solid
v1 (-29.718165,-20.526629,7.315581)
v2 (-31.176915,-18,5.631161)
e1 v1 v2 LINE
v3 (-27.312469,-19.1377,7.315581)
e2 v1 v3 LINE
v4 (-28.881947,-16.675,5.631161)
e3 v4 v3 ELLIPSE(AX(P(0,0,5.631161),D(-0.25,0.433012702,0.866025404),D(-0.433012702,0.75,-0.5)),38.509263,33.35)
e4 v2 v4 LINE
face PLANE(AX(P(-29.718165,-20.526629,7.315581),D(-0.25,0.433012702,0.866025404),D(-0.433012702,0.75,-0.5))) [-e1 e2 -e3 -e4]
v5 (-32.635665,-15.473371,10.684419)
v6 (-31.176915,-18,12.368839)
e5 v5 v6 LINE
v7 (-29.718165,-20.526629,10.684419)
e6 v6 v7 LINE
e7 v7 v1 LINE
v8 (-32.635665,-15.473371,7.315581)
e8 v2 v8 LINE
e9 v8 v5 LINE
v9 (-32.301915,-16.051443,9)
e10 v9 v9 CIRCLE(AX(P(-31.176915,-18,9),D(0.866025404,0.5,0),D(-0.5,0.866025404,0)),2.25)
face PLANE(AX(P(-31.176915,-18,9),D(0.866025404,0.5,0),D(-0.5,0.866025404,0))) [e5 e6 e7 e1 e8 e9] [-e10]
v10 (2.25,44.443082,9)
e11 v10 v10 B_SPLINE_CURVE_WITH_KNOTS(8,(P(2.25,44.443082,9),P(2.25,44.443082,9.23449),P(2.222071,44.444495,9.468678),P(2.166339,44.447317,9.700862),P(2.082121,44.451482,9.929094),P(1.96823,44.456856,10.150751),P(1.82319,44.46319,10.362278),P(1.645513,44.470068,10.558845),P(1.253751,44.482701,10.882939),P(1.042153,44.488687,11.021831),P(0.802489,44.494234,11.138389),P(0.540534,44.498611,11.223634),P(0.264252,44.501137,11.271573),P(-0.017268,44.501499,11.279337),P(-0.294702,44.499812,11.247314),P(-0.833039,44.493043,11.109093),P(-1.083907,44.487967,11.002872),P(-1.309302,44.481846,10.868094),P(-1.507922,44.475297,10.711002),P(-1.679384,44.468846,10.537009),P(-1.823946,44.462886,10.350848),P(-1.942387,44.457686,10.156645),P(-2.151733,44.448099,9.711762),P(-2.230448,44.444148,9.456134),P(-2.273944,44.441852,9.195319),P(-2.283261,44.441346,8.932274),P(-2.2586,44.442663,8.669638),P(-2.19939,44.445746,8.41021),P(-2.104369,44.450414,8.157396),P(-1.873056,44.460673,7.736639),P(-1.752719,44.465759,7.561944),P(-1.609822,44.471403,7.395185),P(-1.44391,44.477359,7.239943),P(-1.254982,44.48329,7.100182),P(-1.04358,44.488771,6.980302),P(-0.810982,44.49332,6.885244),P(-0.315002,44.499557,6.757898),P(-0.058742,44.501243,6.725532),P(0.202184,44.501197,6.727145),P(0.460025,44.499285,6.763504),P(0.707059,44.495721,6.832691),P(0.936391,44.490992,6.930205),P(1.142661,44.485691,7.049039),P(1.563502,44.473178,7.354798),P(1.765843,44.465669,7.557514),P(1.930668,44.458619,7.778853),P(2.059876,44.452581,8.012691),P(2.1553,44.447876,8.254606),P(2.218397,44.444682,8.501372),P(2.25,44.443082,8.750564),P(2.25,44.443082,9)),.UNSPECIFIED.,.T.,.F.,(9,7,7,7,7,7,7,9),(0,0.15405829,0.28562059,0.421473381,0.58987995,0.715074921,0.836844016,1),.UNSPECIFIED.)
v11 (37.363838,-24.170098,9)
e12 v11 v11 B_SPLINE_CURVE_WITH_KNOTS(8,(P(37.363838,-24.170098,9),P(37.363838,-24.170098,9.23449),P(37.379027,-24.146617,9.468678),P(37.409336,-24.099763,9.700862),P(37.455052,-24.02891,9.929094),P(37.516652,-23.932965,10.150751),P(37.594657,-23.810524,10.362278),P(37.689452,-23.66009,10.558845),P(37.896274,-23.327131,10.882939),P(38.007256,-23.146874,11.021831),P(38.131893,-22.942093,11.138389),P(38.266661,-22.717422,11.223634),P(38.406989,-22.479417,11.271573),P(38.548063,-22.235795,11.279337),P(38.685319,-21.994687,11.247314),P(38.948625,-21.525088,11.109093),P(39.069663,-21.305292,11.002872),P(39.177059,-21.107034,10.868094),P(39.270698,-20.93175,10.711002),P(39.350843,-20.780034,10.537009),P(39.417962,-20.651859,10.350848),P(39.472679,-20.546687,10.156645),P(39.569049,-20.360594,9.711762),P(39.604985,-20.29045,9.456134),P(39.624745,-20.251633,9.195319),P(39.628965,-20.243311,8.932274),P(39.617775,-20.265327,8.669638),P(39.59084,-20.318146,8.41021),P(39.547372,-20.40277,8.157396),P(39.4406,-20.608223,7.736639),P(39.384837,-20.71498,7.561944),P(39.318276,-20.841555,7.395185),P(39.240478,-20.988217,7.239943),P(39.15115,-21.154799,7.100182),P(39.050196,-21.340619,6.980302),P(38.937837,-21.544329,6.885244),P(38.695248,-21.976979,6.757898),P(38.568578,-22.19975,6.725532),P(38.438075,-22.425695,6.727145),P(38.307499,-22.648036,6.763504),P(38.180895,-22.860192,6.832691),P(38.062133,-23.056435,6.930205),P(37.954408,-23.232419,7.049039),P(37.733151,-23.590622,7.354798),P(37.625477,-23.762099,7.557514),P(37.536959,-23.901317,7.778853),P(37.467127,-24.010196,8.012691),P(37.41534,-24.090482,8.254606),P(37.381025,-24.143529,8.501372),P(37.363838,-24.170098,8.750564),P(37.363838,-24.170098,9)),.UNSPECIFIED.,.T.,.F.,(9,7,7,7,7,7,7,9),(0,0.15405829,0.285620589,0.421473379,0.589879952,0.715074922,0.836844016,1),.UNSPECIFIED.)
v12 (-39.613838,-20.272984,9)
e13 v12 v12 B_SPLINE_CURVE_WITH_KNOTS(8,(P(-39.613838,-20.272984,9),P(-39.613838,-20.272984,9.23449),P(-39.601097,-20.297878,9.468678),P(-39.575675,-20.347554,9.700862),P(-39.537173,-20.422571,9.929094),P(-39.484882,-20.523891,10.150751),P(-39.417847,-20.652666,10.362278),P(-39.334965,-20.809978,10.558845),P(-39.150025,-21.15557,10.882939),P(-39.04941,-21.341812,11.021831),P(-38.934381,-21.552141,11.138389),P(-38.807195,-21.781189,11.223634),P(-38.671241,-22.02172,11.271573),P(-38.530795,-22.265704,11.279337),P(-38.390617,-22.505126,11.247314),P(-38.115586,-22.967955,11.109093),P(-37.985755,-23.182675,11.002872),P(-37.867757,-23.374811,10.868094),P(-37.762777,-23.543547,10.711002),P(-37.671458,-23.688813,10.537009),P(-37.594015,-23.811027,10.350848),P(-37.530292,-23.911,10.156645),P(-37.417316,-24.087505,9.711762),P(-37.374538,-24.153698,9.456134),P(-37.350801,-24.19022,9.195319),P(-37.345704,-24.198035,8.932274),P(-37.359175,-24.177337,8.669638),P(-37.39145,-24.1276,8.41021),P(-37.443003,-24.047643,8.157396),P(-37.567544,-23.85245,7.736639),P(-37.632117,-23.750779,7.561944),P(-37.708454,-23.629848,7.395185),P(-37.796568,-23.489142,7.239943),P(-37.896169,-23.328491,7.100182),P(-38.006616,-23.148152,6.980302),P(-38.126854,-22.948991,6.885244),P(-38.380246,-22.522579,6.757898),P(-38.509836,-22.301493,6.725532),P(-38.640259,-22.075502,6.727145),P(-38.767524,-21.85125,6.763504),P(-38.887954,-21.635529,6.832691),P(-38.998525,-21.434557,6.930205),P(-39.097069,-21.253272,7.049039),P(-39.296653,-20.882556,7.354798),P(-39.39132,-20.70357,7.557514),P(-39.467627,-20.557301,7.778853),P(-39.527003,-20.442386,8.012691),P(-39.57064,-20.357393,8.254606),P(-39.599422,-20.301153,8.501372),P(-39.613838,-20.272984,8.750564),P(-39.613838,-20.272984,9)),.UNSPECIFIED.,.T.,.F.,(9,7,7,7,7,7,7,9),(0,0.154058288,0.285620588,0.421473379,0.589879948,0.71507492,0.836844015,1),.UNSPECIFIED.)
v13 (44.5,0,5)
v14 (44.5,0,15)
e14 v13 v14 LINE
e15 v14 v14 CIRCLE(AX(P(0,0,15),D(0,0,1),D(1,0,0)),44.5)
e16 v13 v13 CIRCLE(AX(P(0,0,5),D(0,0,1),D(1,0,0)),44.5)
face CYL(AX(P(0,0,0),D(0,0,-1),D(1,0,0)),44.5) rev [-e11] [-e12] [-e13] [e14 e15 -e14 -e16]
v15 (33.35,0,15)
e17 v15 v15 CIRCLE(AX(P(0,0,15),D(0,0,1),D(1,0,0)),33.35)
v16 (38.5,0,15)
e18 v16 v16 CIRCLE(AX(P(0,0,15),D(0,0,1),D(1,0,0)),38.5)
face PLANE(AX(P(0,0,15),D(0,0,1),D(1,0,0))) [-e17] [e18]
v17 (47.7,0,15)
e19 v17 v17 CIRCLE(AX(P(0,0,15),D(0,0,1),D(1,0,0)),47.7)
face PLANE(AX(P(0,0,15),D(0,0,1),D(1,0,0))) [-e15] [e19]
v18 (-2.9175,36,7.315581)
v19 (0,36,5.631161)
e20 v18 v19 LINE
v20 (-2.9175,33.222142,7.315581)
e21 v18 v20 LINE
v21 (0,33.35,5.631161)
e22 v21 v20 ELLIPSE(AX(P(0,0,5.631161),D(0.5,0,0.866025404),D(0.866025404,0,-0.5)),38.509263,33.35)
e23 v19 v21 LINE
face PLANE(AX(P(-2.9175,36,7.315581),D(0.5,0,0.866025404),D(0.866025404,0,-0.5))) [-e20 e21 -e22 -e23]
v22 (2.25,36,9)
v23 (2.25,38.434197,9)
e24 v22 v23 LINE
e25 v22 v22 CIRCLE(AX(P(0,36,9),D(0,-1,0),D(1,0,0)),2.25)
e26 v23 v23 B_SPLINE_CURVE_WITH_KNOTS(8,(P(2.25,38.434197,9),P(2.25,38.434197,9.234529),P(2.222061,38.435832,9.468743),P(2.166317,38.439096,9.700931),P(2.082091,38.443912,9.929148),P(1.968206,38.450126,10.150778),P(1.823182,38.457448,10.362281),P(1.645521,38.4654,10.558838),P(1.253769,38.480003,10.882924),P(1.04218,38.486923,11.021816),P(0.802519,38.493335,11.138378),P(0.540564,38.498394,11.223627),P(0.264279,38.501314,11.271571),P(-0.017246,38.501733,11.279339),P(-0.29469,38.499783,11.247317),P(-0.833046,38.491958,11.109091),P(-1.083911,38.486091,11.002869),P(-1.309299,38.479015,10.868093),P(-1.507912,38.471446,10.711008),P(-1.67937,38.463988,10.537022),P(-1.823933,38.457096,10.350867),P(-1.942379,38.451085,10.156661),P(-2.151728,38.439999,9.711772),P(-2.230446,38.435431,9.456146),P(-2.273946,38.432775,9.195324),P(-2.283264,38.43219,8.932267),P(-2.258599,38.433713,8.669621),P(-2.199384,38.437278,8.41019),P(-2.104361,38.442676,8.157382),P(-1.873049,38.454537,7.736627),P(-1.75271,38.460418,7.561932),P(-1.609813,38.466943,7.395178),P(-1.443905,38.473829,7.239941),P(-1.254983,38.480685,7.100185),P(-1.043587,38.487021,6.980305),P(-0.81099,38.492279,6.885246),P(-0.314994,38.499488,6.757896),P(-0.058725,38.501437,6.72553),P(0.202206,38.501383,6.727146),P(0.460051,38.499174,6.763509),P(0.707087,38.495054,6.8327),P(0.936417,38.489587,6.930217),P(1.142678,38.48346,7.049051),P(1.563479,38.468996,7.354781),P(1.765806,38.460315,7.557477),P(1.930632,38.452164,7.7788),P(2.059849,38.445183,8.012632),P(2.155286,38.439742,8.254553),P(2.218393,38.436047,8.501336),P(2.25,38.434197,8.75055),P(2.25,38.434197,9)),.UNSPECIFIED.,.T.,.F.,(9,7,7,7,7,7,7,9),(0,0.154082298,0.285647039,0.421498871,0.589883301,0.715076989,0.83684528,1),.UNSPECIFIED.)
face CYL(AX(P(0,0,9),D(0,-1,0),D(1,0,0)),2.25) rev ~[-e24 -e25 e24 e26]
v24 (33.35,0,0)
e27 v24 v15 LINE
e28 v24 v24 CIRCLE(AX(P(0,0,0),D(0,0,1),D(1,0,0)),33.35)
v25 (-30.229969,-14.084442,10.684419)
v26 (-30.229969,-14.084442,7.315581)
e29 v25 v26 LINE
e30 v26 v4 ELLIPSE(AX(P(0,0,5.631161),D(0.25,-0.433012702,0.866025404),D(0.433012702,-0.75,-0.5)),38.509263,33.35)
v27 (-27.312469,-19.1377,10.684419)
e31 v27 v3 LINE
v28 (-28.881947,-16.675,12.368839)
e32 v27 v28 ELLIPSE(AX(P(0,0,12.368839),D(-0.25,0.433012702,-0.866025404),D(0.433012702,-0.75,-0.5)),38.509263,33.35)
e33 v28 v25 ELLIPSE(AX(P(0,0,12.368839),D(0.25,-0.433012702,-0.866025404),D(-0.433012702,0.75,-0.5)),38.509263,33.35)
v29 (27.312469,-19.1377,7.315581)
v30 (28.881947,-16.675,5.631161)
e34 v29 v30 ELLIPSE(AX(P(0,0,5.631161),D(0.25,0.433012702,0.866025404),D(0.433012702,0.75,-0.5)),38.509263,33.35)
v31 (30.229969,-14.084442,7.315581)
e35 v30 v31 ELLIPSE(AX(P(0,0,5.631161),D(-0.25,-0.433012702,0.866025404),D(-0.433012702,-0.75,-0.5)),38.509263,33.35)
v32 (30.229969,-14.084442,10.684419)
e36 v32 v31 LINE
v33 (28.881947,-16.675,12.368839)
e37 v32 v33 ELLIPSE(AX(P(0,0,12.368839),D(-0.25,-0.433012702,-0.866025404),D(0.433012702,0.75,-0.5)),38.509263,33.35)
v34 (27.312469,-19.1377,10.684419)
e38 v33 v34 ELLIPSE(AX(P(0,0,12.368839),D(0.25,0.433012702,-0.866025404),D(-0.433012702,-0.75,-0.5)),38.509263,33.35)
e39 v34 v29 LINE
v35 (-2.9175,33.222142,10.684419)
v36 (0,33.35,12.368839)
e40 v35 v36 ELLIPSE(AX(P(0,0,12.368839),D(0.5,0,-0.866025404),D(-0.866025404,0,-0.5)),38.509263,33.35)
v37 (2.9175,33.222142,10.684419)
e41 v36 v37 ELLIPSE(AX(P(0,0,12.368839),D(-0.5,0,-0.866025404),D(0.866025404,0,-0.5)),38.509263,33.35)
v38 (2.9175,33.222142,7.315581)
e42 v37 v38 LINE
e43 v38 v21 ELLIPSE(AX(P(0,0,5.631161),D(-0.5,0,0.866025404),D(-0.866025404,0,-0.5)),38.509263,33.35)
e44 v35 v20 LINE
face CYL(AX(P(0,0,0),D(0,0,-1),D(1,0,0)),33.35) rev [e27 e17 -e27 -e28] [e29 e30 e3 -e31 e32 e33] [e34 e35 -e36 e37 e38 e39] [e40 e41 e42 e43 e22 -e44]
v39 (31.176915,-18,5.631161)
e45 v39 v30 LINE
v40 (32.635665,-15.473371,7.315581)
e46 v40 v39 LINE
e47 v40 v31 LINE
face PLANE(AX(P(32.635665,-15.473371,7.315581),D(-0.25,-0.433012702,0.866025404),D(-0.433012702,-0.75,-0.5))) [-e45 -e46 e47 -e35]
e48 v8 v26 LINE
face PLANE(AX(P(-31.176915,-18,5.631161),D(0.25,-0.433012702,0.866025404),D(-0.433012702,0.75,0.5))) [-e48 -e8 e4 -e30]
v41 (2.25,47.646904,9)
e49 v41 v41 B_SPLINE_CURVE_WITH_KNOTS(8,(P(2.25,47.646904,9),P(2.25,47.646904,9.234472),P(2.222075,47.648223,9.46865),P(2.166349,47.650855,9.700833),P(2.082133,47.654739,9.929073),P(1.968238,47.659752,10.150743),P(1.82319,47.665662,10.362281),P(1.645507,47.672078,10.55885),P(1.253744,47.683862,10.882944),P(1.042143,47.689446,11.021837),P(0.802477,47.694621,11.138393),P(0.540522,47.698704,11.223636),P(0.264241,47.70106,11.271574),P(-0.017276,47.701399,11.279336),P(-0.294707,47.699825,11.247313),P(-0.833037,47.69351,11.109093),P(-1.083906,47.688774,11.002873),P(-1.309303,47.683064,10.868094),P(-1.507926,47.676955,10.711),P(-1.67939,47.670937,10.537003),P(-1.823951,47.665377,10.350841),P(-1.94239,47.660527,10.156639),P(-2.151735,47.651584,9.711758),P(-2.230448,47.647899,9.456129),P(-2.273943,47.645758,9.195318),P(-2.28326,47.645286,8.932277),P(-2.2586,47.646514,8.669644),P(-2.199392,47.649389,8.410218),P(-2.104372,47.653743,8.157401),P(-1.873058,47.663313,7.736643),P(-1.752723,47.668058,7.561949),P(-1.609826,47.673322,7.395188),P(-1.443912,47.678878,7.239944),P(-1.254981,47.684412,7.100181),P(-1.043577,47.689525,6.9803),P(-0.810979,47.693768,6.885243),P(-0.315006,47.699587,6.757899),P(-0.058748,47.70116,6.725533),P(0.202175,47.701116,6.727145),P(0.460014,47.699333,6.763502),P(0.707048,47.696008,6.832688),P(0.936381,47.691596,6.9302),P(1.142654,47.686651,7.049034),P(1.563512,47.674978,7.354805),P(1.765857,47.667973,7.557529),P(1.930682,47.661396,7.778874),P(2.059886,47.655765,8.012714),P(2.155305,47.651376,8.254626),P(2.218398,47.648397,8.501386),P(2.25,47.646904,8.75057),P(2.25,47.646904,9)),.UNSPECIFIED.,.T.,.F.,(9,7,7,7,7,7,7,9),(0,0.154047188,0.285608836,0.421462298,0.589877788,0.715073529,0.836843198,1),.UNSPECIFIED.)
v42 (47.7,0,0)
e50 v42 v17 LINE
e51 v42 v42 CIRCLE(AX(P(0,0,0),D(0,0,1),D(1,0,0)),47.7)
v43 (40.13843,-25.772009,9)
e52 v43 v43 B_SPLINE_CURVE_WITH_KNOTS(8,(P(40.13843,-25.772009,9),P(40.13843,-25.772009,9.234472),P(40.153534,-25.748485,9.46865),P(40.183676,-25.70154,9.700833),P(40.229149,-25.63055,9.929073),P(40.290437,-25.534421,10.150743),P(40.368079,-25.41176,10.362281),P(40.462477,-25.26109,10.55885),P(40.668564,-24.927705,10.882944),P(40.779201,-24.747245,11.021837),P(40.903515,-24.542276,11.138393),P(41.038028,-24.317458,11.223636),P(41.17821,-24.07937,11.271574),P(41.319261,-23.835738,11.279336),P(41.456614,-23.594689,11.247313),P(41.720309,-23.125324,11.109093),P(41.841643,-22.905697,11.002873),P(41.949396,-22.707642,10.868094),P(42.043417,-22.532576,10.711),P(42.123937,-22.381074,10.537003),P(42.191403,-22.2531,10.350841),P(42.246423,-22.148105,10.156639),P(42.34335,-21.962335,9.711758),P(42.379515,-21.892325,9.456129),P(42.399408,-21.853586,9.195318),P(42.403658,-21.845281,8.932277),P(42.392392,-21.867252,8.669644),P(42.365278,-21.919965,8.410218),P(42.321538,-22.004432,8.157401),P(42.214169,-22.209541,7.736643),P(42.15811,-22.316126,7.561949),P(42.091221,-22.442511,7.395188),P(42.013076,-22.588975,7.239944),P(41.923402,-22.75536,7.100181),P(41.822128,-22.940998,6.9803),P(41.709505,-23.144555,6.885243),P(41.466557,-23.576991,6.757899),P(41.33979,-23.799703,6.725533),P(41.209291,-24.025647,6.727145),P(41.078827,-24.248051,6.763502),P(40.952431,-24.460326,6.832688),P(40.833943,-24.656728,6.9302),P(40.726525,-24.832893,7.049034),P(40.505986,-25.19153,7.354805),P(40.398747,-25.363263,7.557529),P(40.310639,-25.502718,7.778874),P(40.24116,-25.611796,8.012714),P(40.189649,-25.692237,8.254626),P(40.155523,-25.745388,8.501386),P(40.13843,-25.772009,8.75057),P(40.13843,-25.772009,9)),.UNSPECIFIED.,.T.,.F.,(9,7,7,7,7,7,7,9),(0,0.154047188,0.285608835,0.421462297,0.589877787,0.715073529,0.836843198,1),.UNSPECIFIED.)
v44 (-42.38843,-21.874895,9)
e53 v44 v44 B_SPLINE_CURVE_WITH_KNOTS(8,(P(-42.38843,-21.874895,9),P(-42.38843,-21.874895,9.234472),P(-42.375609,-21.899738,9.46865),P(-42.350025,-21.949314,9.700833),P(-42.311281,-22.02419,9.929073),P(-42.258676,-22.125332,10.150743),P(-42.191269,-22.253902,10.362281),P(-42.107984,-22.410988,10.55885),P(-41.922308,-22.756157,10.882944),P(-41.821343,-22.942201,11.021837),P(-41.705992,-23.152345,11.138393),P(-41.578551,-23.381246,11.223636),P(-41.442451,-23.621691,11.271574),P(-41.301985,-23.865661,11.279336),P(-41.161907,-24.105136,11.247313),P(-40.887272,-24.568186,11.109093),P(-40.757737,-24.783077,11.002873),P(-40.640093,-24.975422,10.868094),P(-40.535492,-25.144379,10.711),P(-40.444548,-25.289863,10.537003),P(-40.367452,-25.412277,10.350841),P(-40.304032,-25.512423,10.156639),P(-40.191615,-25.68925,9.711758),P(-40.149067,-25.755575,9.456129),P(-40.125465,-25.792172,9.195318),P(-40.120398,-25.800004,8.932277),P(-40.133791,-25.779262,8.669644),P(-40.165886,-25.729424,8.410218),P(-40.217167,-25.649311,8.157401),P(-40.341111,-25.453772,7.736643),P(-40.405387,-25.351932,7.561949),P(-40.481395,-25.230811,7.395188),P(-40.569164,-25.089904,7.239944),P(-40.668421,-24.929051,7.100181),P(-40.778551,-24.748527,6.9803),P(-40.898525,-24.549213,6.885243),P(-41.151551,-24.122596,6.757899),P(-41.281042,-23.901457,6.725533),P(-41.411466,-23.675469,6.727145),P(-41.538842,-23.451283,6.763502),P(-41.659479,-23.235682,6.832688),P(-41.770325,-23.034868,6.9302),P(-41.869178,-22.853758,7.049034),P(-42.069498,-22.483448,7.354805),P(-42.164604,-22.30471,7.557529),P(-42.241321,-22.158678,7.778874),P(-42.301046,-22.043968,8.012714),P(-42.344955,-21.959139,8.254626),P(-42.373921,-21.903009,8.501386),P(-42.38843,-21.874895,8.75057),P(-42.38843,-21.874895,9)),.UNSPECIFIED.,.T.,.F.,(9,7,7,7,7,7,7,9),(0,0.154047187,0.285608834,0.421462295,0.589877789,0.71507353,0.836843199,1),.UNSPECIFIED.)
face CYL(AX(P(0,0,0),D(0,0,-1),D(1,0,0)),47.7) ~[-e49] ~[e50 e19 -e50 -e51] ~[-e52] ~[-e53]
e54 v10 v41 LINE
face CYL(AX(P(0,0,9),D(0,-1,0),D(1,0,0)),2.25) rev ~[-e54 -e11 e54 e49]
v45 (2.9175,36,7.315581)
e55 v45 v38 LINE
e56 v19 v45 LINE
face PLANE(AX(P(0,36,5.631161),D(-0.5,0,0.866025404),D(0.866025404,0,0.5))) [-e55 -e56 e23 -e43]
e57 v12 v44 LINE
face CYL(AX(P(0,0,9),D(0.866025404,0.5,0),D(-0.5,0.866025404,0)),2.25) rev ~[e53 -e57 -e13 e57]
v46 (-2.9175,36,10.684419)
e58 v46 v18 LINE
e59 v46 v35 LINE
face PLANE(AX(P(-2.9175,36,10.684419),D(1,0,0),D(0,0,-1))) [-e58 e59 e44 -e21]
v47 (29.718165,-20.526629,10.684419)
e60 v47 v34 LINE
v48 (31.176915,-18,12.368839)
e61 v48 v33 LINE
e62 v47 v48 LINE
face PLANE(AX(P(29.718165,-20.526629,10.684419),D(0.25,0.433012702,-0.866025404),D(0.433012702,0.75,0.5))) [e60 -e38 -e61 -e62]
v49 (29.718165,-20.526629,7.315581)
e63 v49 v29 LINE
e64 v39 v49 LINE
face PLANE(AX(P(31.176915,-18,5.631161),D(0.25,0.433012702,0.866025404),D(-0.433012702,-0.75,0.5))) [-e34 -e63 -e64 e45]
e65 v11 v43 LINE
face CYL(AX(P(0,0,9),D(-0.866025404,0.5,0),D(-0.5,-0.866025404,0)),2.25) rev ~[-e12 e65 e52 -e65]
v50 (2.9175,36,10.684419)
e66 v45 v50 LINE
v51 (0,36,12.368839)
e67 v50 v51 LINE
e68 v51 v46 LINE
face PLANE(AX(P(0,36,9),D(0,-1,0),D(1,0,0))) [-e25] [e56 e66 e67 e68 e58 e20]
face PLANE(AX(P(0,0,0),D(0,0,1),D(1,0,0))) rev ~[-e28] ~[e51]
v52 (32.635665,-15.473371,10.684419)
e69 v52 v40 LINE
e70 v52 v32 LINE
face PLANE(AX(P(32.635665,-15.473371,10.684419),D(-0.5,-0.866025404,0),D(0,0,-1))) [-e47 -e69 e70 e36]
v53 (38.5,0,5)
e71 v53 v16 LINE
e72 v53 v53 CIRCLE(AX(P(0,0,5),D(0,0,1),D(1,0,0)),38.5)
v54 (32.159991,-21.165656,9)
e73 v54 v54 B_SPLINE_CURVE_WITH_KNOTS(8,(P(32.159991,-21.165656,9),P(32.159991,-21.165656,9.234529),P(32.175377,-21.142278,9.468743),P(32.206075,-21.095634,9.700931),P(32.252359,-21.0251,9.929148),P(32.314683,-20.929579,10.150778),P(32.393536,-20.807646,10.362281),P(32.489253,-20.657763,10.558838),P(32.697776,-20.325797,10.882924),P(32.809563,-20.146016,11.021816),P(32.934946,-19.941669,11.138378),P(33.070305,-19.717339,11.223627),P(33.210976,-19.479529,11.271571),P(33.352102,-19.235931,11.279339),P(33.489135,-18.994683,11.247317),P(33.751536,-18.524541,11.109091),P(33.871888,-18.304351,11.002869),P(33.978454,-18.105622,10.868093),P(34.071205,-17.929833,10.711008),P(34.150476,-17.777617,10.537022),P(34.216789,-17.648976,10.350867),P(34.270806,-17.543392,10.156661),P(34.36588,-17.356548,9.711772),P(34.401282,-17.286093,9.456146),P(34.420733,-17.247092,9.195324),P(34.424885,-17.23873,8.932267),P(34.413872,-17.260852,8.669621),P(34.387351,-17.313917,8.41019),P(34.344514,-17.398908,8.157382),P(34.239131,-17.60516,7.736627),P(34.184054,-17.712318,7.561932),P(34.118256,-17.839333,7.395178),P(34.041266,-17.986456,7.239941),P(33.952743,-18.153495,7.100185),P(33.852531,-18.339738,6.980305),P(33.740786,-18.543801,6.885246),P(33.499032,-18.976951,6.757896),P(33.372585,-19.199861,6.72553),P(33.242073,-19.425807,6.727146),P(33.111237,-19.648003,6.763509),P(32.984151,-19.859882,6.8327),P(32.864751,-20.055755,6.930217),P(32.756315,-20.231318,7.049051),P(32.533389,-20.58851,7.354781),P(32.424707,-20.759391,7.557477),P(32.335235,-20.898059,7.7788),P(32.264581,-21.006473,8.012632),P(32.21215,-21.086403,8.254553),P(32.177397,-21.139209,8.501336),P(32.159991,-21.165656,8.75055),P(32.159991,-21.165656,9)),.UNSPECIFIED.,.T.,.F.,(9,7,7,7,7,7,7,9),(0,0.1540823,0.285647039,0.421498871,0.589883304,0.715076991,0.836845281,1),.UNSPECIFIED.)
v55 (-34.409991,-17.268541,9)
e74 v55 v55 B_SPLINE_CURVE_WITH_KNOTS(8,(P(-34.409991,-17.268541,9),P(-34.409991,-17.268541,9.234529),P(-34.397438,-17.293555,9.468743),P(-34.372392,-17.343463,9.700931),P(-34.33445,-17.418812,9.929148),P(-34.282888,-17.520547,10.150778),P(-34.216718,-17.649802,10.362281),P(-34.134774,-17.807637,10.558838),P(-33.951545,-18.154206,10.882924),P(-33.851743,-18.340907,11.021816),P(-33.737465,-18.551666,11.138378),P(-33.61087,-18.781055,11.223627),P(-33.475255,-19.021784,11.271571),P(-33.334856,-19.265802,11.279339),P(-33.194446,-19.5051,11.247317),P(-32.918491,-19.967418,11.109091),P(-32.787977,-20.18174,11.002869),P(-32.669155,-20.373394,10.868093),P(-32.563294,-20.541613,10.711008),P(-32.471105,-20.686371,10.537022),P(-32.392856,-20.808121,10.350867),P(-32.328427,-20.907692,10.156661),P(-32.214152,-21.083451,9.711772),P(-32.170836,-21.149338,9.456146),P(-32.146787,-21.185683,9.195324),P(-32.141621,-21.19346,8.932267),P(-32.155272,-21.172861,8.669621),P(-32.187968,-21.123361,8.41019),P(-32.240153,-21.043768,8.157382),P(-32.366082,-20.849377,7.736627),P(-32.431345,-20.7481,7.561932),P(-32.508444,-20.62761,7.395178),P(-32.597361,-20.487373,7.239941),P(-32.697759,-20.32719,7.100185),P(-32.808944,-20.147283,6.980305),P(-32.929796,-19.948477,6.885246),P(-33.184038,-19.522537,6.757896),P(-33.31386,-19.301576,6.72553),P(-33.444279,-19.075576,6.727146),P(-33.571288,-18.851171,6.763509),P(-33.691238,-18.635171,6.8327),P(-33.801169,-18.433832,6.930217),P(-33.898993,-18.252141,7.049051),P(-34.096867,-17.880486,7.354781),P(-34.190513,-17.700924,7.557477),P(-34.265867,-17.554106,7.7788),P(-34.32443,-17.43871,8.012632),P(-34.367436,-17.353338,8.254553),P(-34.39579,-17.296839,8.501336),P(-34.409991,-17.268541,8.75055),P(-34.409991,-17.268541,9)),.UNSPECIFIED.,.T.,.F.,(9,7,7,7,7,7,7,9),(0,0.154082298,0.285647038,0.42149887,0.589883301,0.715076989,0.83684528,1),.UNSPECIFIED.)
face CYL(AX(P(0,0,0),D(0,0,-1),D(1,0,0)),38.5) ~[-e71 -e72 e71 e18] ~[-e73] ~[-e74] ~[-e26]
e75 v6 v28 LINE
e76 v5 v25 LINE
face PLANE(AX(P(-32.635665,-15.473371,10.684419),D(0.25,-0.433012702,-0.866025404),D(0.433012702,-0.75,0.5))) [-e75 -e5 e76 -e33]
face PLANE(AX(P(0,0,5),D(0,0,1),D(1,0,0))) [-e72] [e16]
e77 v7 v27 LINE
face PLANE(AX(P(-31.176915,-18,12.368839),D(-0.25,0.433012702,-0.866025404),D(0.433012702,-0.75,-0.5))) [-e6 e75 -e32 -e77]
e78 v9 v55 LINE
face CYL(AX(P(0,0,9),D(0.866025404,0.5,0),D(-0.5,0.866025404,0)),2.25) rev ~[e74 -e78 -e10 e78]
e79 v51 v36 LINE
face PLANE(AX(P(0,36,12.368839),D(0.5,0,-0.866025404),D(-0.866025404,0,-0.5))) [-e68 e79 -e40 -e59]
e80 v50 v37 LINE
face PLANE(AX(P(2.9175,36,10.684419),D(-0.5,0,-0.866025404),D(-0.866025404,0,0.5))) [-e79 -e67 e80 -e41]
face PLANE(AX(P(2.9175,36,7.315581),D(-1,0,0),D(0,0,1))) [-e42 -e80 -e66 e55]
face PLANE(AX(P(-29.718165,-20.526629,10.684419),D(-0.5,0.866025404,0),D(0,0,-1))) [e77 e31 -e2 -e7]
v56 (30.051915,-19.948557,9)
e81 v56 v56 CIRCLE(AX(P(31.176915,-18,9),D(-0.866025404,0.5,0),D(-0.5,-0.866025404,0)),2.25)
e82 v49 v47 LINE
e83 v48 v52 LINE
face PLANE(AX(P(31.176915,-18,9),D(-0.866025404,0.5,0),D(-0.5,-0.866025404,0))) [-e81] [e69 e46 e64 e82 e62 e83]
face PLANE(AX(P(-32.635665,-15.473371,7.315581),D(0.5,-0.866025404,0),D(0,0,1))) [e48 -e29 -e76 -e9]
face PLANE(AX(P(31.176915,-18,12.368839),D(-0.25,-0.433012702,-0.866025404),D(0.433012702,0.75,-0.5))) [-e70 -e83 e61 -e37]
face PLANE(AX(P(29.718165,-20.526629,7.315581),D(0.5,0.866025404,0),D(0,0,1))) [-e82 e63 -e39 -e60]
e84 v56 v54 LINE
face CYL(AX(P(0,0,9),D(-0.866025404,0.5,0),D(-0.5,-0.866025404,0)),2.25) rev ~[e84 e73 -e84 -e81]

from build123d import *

# Parameters (mm, degrees)
F0_R             = 38.5
F0_R_2           = 33.35
F1_DEPTH         = 15
F2_R             = 44.5
F2_R_2           = 38.5
F3_DEPTH         = 5
F4_R             = 47.7
F4_R_2           = 44.5
F5_DEPTH         = 15
F6_R             = 2.25
F7_DEPTH         = 47.701
F7_COPIES_COUNT  = 3
F10_DEPTH        = 4
F10_COPIES_COUNT = 3


# Not quite as in the source:
# - a pattern or mirror of a feature is missing from the dataset's text; its kind, count and spacing are read off the source's solid


with BuildPart() as f1:
    # F0 (on Top) → F1 (new body)
    with BuildSketch(Plane.XY):
        Circle(F0_R)
        Circle(F0_R_2, mode=Mode.SUBTRACT)
    extrude(amount=F1_DEPTH)

    # F2 (on Top) → F3 (join)
    with BuildSketch(Plane.XY):
        Circle(F2_R)
        Circle(F2_R_2, mode=Mode.SUBTRACT)
    extrude(amount=F3_DEPTH)

    # F4 (on Top) → F5 (join)
    with BuildSketch(Plane.XY):
        Circle(F4_R)
        Circle(F4_R_2, mode=Mode.SUBTRACT)
    extrude(amount=F5_DEPTH)

    # F6 (on Front) → F7 (cut, through all)
    with BuildSketch(Plane.XZ):
        with Locations((0, 9)):
            Circle(F6_R)
    f7 = extrude(amount=-F7_DEPTH, mode=Mode.SUBTRACT)

    # F7_copies: F7 ×3 about axis
    f7_copies_axis = Axis((0, 0, 0), (0, 0, 1))
    for i in range(1, F7_COPIES_COUNT):
        add(f7.rotate(f7_copies_axis, i * 360 / F7_COPIES_COUNT), mode=Mode.SUBTRACT)

    # F9 (on offset) → F10 (cut)
    with BuildSketch(Plane.XZ.offset(-36)):
        Polygon((2.9175, 7.3155805896), (2.9175, 10.6844194104), (0, 12.3688388207), (-2.9175, 10.6844194104), (-2.9175, 7.3155805896), (0, 5.6311611793), align=None)
    f10 = extrude(amount=F10_DEPTH, mode=Mode.SUBTRACT)

    # F10_copies: F10 ×3 about axis
    f10_copies_axis = Axis((0, 0, 0), (0, 0, 1))
    for i in range(1, F10_COPIES_COUNT):
        add(f10.rotate(f10_copies_axis, i * 360 / F10_COPIES_COUNT), mode=Mode.SUBTRACT)


solid = f1.part
